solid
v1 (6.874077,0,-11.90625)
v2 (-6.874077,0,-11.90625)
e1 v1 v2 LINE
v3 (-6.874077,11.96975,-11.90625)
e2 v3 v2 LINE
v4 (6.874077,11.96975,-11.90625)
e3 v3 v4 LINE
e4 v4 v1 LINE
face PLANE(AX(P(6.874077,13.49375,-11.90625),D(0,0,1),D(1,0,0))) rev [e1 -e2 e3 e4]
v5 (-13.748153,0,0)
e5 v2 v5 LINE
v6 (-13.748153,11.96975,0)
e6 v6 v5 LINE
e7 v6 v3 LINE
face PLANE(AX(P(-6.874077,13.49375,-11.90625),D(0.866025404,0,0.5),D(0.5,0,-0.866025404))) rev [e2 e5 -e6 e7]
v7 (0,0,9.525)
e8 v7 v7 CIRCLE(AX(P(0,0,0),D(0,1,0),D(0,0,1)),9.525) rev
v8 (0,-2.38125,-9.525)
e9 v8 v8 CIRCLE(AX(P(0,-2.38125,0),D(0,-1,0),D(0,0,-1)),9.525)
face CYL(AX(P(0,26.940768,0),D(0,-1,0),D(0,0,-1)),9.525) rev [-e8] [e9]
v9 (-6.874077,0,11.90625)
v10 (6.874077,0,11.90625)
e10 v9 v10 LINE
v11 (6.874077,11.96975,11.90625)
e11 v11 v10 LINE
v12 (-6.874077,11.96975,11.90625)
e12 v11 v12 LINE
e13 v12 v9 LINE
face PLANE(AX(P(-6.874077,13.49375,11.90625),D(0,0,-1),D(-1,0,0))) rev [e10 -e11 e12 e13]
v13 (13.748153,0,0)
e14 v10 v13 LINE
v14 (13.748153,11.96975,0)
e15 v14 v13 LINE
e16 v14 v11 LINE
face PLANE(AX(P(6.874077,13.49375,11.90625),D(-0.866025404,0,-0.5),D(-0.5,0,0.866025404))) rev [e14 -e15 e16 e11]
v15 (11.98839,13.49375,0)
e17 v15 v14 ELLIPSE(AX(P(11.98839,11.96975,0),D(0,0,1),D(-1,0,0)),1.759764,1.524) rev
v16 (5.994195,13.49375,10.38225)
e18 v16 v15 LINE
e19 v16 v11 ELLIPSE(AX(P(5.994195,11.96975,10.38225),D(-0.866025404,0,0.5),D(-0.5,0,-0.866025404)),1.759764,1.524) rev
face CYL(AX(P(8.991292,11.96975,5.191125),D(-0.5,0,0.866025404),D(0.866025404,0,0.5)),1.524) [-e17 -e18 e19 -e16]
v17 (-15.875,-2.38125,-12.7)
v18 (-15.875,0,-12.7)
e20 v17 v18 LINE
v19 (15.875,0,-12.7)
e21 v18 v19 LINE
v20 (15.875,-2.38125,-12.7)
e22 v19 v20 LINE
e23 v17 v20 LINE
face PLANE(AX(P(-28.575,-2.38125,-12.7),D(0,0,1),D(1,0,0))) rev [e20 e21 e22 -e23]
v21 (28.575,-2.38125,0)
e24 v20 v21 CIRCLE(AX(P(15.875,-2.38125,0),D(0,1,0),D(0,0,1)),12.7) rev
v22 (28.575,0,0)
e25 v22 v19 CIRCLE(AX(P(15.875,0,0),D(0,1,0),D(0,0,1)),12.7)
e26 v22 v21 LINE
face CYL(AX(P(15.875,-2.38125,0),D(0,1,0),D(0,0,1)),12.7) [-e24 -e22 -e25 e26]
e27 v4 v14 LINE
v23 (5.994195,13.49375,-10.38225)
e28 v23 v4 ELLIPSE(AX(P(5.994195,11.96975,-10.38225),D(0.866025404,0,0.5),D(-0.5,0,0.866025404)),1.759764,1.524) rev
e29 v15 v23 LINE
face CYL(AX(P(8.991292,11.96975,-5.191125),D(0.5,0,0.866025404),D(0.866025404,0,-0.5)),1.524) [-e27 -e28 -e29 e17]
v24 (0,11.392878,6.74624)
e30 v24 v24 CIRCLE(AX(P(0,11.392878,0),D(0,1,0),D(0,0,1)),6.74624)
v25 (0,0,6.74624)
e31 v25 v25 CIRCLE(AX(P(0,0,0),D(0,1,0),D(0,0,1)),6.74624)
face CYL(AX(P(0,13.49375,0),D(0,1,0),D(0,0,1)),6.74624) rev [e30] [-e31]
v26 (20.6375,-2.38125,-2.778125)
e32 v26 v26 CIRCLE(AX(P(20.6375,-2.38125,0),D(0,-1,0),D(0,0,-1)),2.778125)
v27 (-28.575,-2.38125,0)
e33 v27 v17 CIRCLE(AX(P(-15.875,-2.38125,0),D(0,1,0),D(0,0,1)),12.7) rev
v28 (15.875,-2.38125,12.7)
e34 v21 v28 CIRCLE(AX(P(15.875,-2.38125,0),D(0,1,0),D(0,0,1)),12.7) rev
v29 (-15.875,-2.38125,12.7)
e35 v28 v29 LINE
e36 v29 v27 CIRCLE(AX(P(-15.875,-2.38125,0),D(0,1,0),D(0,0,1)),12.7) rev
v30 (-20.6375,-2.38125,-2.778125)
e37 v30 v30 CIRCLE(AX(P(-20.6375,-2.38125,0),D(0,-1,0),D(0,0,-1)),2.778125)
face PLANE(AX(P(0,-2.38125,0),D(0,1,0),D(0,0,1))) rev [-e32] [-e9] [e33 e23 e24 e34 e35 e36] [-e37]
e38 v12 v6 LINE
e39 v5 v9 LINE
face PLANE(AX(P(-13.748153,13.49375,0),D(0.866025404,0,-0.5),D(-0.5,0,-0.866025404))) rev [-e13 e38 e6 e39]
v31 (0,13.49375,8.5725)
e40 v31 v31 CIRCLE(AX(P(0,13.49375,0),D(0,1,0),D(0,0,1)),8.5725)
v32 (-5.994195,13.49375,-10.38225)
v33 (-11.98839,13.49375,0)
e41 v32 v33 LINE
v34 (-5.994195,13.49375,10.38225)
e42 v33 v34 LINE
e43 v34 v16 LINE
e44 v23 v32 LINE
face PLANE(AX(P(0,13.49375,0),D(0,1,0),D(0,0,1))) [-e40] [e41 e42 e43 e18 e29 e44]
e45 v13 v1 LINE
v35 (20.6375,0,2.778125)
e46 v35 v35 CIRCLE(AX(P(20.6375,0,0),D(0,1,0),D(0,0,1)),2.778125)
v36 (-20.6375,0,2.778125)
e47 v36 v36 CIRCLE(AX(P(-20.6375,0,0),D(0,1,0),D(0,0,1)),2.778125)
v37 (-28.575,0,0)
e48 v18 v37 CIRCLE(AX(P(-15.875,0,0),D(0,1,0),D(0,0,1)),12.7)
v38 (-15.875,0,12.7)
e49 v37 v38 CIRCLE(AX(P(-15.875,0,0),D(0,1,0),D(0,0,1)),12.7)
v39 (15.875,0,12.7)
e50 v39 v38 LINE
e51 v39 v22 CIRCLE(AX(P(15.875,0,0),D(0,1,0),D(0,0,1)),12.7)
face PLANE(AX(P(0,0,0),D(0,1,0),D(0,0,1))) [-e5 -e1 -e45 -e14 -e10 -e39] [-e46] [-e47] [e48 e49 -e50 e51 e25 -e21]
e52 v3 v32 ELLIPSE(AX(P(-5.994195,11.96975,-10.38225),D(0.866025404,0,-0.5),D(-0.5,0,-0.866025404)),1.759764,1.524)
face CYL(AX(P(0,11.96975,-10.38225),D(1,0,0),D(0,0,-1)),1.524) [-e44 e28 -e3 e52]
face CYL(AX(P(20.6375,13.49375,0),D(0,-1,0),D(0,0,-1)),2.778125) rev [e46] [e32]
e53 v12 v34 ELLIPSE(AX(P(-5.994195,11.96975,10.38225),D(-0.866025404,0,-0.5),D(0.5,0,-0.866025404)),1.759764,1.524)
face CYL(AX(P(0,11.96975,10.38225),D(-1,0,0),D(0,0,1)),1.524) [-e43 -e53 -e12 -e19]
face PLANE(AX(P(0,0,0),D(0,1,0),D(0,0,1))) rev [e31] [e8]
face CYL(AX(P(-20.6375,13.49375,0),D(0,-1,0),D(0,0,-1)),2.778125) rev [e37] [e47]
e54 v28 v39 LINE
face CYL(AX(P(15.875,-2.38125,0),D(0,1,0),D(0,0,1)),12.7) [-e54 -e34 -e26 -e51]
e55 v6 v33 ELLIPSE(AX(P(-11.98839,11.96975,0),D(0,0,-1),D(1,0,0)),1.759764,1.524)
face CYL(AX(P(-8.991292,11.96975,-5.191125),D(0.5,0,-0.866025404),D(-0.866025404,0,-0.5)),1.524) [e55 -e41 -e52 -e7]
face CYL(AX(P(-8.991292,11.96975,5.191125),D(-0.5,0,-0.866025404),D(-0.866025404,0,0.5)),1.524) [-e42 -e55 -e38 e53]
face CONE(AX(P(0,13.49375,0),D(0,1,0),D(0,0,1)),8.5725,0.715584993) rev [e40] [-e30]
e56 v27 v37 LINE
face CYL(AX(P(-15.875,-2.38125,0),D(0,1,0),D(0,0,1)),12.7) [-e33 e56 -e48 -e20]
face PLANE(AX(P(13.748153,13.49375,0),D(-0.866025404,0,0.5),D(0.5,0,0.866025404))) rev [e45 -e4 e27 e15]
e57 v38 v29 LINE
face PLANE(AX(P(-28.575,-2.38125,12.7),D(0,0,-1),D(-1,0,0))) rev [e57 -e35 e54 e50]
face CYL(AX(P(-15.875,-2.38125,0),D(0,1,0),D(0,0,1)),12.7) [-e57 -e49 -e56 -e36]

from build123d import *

# Parameters (mm, degrees)
BOSS_EXTRUDE1_DEPTH               = 13.49375
F_5_8_11_TAPPED_HOLE1_D           = 13.49248
F_5_8_11_TAPPED_HOLE1_CSINK_D     = 17.145
F_5_8_11_TAPPED_HOLE1_CSINK_ANGLE = 82
FILLET1_R                         = 1.524
SKETCH4_W                         = 57.15
SKETCH4_H                         = 25.4
BOSS_EXTRUDE2_DEPTH               = 2.38125
FILLET2_R                         = 12.7
SKETCH5_R                         = 9.525
CUT_EXTRUDE1_DEPTH                = 2.38125
SKETCH6_R                         = 2.778125
CUT_EXTRUDE2_DEPTH                = 36.06902123


with BuildPart() as part:
    # Sketch1 → Boss-Extrude1 (new body)
    with BuildSketch(Plane(origin=(0, 0, 0), x_dir=(1, 0, 0), z_dir=(0, 1, 0))):
        Polygon((13.748153285, 0), (6.874076643, 11.90625), (-6.874076643, 11.90625), (-13.748153285, 0), (-6.874076643, -11.90625), (6.874076643, -11.90625), align=None)
    extrude(amount=BOSS_EXTRUDE1_DEPTH)

    # 5/8-11 Tapped Hole1 (through all)
    with Locations(Plane(origin=(0, 13.49375, 0), x_dir=(1, 0, 0), z_dir=(0, 1, 0))):
        with Locations((0, 0)):
            CounterSinkHole(F_5_8_11_TAPPED_HOLE1_D / 2, F_5_8_11_TAPPED_HOLE1_CSINK_D / 2, counter_sink_angle=F_5_8_11_TAPPED_HOLE1_CSINK_ANGLE)

    # Fillet1
    fillet1_edges = [part.edges().sort_by_distance(p)[0] for p in [
        (0, 13.49375, -11.90625),
        (-10.311114964, 13.49375, -5.953125),
        (-10.311114964, 13.49375, 5.953125),
        (0, 13.49375, 11.90625),
        (10.311114964, 13.49375, 5.953125),
        (10.311114964, 13.49375, -5.953125),
    ]]
    fillet(fillet1_edges, radius=FILLET1_R)

    # Sketch4 → Boss-Extrude2 (add)
    with BuildSketch(Plane.XZ):
        Rectangle(SKETCH4_W, SKETCH4_H)
    extrude(amount=BOSS_EXTRUDE2_DEPTH)

    # Fillet2
    fillet2_edges = [part.edges().sort_by_distance(p)[0] for p in [
        (-28.575, -1.190625, -12.7),
        (-28.575, -1.190625, 12.7),
        (28.575, -1.190625, -12.7),
        (28.575, -1.190625, 12.7),
    ]]
    fillet(fillet2_edges, radius=FILLET2_R - 0.0001)  # a hair under: the kernel refuses the full size

    # Sketch5 → Cut-Extrude1 (cut)
    with BuildSketch(Plane.XZ.offset(2.38125)):
        with Locations(Location((0, 0, 0), (0, 0, 270))):
            Circle(SKETCH5_R)
    extrude(amount=-CUT_EXTRUDE1_DEPTH, mode=Mode.SUBTRACT)

    # Sketch6 → Cut-Extrude2 (cut, through all)
    with BuildSketch(Plane.XZ.offset(2.38125)):
        with Locations(Location((-20.6375, 0, 0), (0, 0, 270))):
            Circle(SKETCH6_R)
        with Locations(Location((20.6375, 0, 0), (0, 0, 270))):
            Circle(SKETCH6_R)
    extrude(amount=-CUT_EXTRUDE2_DEPTH, mode=Mode.SUBTRACT)


solid = part.part
